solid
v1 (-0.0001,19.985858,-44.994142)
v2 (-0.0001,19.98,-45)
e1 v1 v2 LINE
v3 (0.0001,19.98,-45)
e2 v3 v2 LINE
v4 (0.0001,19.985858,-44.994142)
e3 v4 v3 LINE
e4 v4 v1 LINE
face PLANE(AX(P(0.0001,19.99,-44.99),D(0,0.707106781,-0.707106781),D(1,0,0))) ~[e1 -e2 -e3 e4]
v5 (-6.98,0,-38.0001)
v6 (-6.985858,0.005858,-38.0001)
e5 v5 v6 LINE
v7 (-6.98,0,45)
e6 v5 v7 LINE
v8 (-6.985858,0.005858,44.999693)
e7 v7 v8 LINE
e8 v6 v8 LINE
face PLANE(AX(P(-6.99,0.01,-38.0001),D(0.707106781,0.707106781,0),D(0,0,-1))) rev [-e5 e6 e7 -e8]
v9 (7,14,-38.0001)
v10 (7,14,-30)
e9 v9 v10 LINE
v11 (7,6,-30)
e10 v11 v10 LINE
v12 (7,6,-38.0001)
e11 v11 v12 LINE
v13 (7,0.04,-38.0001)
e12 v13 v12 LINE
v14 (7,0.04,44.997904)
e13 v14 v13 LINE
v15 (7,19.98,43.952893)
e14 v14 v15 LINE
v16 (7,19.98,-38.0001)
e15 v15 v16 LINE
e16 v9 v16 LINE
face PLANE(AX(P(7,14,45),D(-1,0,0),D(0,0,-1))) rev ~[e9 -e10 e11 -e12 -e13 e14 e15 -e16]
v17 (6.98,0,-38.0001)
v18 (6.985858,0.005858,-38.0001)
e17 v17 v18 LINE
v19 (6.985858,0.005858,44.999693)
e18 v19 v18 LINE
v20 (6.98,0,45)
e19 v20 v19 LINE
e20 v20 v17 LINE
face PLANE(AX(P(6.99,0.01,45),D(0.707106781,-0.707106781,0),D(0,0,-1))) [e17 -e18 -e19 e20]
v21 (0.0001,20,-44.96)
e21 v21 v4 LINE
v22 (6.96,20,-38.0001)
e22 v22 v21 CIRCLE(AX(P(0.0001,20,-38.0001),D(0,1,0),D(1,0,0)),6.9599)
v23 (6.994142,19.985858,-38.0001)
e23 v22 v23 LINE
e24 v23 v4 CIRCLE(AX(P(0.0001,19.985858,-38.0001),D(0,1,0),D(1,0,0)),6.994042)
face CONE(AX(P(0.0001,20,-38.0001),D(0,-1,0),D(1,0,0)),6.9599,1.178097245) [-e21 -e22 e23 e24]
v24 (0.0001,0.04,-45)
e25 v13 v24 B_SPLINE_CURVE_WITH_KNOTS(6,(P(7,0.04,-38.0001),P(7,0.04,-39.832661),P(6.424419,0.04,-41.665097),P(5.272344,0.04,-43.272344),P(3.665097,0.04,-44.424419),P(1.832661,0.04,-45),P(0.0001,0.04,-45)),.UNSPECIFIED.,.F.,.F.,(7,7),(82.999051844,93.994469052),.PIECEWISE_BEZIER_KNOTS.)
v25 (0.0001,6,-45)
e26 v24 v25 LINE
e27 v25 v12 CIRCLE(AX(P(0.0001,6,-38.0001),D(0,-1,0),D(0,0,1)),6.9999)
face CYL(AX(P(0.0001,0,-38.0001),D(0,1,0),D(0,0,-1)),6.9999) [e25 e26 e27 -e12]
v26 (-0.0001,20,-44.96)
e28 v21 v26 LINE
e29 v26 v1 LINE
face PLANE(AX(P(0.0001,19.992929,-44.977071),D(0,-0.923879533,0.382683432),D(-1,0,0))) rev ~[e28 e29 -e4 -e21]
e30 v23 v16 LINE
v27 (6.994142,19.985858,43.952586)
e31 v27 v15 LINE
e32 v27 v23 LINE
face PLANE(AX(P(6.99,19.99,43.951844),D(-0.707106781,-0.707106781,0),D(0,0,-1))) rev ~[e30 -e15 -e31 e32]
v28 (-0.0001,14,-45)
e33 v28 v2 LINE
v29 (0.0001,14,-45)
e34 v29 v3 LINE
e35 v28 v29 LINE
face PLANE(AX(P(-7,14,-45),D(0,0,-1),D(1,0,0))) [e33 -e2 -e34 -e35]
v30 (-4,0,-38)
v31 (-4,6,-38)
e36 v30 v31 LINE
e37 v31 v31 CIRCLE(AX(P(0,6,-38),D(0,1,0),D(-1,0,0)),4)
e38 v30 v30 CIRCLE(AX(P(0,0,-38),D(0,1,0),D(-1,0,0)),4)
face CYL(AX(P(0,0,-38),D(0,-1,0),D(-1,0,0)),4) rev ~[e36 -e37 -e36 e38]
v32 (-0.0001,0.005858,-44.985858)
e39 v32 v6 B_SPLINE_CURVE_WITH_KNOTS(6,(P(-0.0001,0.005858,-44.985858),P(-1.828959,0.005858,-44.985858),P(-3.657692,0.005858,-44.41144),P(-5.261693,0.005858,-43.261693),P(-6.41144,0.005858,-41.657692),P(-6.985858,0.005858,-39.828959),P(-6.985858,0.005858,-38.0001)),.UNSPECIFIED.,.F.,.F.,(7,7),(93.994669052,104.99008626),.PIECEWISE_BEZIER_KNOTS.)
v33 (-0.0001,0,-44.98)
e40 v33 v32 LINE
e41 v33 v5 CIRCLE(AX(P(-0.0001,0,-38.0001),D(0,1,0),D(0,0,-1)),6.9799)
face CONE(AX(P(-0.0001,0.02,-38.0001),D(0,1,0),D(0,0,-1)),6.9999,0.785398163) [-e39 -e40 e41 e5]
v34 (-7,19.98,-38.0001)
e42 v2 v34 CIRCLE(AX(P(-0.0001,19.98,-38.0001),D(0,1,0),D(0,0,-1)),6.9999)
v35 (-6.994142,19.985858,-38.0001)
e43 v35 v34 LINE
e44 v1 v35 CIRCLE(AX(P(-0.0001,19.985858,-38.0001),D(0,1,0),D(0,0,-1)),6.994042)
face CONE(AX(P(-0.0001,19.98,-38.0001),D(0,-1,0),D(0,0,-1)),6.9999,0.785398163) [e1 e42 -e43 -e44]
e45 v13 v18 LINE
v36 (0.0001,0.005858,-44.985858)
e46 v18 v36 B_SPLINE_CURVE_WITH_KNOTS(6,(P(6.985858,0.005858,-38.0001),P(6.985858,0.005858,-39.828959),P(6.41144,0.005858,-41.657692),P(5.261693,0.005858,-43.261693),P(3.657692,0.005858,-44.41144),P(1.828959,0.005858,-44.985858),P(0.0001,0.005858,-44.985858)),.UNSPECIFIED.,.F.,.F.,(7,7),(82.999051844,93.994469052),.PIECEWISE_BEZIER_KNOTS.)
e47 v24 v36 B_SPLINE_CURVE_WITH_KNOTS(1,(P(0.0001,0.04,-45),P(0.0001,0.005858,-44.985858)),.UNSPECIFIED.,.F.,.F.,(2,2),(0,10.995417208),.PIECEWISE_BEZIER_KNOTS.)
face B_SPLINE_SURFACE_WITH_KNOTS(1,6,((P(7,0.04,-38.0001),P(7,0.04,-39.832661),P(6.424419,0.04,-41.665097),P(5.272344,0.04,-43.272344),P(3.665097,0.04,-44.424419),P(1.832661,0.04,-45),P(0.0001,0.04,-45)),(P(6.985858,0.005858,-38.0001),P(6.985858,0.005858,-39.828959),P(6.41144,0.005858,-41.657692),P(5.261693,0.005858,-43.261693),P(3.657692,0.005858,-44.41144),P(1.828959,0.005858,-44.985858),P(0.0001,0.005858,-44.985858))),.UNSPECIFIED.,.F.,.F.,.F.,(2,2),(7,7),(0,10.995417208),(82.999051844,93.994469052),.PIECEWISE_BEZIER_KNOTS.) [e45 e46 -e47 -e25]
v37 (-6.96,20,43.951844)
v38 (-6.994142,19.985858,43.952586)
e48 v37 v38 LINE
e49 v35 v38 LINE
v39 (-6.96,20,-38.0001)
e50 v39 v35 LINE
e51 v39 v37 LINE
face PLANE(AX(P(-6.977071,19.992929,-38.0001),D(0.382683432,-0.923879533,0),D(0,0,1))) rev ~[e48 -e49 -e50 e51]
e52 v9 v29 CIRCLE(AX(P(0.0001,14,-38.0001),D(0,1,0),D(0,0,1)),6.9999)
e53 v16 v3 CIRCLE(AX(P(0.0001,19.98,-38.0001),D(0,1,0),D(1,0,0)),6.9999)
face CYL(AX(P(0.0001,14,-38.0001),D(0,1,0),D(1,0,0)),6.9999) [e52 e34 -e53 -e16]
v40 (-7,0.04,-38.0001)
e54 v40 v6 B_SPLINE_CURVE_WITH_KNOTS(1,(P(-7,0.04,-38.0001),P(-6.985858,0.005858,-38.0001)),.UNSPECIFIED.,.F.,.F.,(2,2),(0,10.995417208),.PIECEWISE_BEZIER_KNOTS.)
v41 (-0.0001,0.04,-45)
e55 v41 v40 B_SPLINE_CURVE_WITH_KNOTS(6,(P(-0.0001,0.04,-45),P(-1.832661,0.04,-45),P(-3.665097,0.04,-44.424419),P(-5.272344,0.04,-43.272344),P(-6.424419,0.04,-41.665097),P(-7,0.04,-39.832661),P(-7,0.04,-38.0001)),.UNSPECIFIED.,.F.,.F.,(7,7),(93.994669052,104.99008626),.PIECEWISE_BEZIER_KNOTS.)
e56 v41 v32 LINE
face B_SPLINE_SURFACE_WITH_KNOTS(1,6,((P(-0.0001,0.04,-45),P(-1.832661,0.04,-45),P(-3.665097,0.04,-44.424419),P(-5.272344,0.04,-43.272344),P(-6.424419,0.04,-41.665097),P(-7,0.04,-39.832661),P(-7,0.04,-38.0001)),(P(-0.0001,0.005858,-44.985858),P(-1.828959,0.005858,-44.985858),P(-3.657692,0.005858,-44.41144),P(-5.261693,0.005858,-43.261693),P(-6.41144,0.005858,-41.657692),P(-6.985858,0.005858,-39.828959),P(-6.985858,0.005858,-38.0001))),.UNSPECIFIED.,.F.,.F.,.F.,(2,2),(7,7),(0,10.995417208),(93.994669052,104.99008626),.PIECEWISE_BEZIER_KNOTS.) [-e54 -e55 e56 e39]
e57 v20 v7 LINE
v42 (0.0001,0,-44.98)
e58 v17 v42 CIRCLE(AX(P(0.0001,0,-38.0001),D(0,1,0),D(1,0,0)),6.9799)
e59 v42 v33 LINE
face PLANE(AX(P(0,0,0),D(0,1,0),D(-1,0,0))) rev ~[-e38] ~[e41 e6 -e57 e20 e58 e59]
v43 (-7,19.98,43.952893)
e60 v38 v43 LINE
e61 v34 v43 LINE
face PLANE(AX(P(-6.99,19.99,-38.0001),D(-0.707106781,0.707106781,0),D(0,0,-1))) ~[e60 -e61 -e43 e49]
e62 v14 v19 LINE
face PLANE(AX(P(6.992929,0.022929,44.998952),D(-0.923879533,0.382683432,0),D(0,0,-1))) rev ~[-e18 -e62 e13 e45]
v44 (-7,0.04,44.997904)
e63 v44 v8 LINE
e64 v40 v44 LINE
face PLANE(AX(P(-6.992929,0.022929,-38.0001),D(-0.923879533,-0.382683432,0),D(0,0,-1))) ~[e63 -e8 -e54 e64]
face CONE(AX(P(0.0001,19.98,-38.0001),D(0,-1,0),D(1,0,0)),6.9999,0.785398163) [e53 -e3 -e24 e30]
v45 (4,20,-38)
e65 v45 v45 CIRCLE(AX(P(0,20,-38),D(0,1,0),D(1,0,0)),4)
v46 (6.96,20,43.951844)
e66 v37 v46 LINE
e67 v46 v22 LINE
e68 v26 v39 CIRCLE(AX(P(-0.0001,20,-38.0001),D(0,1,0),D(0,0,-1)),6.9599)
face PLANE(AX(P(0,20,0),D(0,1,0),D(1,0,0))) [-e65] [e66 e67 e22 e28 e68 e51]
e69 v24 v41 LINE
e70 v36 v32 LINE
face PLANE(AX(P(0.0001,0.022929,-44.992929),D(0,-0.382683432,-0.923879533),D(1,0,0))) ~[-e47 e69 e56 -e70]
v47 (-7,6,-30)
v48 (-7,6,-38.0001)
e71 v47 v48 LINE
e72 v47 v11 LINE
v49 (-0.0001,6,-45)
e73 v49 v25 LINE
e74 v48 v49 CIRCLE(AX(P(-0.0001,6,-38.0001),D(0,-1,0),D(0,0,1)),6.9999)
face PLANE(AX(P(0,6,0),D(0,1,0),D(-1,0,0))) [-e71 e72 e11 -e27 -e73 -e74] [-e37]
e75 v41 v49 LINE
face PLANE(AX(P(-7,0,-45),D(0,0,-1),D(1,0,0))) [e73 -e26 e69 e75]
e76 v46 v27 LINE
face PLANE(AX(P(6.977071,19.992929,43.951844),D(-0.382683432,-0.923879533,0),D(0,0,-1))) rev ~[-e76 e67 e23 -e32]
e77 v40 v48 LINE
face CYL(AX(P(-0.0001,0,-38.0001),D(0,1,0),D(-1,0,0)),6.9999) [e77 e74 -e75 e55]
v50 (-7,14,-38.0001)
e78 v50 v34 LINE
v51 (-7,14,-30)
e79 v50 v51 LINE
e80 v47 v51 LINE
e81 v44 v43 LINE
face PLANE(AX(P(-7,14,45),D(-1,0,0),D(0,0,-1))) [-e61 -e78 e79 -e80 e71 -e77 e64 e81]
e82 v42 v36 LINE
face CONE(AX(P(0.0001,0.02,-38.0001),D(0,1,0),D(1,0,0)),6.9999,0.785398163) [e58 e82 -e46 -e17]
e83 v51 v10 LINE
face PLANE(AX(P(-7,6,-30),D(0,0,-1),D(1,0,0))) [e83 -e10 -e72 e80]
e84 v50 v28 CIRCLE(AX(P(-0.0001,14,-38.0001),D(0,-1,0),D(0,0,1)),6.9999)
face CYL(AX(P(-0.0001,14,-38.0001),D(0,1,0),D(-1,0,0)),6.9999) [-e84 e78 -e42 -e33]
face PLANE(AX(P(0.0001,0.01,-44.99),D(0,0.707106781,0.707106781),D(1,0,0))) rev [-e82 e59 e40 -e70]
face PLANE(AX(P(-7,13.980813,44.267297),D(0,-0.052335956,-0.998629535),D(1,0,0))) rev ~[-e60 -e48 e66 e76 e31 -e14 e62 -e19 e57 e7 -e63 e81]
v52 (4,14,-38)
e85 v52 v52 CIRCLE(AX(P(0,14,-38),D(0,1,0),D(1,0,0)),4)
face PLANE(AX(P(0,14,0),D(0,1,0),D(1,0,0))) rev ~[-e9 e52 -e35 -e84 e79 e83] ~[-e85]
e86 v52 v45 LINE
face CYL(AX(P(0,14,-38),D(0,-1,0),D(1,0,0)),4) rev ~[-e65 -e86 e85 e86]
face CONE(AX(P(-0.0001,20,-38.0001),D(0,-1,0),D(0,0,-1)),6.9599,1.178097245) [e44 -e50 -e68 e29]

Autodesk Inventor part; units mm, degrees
ref_plane "YZ Plane" through (0, 0, 0) normal (1, 0, 0) x (0, 1, 0)
ref_plane "XZ Plane" through (0, 0, 0) normal (0, 1, 0) x (-1, 0, 0)
ref_plane "XY Plane" through (0, 0, 0) normal (0, 0, 1) x (1, 0, 0)
sketch "Sketch1" plane through (0, 0, 0) normal (0, 1, 0) x (-1, 0, 0)
  line L0 (-7, 0) -> (-7, -45)
  line L1 (-7, 0) -> (-7, 45)
  line L2 (-7, 45) -> (7, 45)
  line L3 (7, 45) -> (7, -45)
  circle A0 centre (0, -38) radius 4
  line L4 (7, -45) -> (-7, -45)
  point P0 (0, 0)
  dimension "d4" = 45
  dimension "d5" = 45
  dimension "d6" = 14
  dimension "d7" = 90
  dimension "d8" = 8
  dimension "d9" = 7
extrude "Extrusion1" add sketch "Sketch1" along normal blind 6
fillet "Fillet1" radius 7 2 edges at (7, 3, -45) (-7, 3, -45)
sketch "Sketch2" plane through (0, 6, 0) normal (0, 1, 0) x (1, 0, 0)
  line L0 (-7, 38) -> (-7, -45) projected
  line L1 (-7, 30) -> (7, 30)
  line L2 (7, -45) -> (7, 38) projected
  arc A0 (7, 38) -> (-7, 38) centre (0, 38) ccw projected
  line L3 (-7, 30) -> (-7, -45)
  line L4 (-7, -45) -> (7, -45) projected
  line L5 (-7, -45) -> (7, -45)
  line L6 (7, -45) -> (7, 30)
  point P0 (0, 0)
  point P1 (0, 30)
  point P2 (0, 45)
  dimension "d13" = 15
extrude "Extrusion2" add sketch "Sketch2" along normal blind 8 contours L1 L2 L4 L0
sketch "Sketch3" plane through (0, 14, 0) normal (0, 1, 0) x (1, 0, 0)
  line L0 (-7, -45) -> (7, -45) projected
  line L1 (-7, -45) -> (-7, 45)
  line L2 (-7, 38) -> (-7, -45) projected
  line L3 (-7, 45) -> (7, 45)
  line L4 (7, -45) -> (7, 38) projected
  line L5 (7, 45) -> (7, -45)
  line L6 (7, -45) -> (-7, -45)
  circle A0 centre (0, 38) radius 4
  point P0 (0, 0)
  dimension "d16" = 90
  dimension "d17" = 8
  dimension "d18" = 7
extrude "Extrusion3" add sketch "Sketch3" along normal blind 6
fillet "Fillet2" radius 7 2 edges at (7, 17, -45) (-7, 17, -45)
draft "FaceDraft1" angle 3 pull direction (0, 1, 0) faces at (2.3333, 13.3333, 45) fixed edges at (0, 0, 45)
chamfer "Chamfer1" distance 0.02 angle 45 3 edges at (7, 20, 2.9759) (4.9498, 20, -42.9498) (-7, 20, 2.9759)
chamfer "Chamfer2" distance 0.02 angle 45 3 edges at (7, 0, 3.5) (4.9498, 0, -42.9498) (-7, 0, 3.4999)
chamfer "Chamfer3" distance 0.02 angle 45 3 edges at (6.98, 20, 2.9759) (4.9356, 20, -42.9356) (-6.98, 20, 2.9759)
chamfer "Chamfer4" distance 0.02 angle 45 3 edges at (-7, 0.02, 3.4994) (4.9498, 0.02, -42.9498) (7, 0.02, 3.4994)
properties part number "Schneidstempel"
